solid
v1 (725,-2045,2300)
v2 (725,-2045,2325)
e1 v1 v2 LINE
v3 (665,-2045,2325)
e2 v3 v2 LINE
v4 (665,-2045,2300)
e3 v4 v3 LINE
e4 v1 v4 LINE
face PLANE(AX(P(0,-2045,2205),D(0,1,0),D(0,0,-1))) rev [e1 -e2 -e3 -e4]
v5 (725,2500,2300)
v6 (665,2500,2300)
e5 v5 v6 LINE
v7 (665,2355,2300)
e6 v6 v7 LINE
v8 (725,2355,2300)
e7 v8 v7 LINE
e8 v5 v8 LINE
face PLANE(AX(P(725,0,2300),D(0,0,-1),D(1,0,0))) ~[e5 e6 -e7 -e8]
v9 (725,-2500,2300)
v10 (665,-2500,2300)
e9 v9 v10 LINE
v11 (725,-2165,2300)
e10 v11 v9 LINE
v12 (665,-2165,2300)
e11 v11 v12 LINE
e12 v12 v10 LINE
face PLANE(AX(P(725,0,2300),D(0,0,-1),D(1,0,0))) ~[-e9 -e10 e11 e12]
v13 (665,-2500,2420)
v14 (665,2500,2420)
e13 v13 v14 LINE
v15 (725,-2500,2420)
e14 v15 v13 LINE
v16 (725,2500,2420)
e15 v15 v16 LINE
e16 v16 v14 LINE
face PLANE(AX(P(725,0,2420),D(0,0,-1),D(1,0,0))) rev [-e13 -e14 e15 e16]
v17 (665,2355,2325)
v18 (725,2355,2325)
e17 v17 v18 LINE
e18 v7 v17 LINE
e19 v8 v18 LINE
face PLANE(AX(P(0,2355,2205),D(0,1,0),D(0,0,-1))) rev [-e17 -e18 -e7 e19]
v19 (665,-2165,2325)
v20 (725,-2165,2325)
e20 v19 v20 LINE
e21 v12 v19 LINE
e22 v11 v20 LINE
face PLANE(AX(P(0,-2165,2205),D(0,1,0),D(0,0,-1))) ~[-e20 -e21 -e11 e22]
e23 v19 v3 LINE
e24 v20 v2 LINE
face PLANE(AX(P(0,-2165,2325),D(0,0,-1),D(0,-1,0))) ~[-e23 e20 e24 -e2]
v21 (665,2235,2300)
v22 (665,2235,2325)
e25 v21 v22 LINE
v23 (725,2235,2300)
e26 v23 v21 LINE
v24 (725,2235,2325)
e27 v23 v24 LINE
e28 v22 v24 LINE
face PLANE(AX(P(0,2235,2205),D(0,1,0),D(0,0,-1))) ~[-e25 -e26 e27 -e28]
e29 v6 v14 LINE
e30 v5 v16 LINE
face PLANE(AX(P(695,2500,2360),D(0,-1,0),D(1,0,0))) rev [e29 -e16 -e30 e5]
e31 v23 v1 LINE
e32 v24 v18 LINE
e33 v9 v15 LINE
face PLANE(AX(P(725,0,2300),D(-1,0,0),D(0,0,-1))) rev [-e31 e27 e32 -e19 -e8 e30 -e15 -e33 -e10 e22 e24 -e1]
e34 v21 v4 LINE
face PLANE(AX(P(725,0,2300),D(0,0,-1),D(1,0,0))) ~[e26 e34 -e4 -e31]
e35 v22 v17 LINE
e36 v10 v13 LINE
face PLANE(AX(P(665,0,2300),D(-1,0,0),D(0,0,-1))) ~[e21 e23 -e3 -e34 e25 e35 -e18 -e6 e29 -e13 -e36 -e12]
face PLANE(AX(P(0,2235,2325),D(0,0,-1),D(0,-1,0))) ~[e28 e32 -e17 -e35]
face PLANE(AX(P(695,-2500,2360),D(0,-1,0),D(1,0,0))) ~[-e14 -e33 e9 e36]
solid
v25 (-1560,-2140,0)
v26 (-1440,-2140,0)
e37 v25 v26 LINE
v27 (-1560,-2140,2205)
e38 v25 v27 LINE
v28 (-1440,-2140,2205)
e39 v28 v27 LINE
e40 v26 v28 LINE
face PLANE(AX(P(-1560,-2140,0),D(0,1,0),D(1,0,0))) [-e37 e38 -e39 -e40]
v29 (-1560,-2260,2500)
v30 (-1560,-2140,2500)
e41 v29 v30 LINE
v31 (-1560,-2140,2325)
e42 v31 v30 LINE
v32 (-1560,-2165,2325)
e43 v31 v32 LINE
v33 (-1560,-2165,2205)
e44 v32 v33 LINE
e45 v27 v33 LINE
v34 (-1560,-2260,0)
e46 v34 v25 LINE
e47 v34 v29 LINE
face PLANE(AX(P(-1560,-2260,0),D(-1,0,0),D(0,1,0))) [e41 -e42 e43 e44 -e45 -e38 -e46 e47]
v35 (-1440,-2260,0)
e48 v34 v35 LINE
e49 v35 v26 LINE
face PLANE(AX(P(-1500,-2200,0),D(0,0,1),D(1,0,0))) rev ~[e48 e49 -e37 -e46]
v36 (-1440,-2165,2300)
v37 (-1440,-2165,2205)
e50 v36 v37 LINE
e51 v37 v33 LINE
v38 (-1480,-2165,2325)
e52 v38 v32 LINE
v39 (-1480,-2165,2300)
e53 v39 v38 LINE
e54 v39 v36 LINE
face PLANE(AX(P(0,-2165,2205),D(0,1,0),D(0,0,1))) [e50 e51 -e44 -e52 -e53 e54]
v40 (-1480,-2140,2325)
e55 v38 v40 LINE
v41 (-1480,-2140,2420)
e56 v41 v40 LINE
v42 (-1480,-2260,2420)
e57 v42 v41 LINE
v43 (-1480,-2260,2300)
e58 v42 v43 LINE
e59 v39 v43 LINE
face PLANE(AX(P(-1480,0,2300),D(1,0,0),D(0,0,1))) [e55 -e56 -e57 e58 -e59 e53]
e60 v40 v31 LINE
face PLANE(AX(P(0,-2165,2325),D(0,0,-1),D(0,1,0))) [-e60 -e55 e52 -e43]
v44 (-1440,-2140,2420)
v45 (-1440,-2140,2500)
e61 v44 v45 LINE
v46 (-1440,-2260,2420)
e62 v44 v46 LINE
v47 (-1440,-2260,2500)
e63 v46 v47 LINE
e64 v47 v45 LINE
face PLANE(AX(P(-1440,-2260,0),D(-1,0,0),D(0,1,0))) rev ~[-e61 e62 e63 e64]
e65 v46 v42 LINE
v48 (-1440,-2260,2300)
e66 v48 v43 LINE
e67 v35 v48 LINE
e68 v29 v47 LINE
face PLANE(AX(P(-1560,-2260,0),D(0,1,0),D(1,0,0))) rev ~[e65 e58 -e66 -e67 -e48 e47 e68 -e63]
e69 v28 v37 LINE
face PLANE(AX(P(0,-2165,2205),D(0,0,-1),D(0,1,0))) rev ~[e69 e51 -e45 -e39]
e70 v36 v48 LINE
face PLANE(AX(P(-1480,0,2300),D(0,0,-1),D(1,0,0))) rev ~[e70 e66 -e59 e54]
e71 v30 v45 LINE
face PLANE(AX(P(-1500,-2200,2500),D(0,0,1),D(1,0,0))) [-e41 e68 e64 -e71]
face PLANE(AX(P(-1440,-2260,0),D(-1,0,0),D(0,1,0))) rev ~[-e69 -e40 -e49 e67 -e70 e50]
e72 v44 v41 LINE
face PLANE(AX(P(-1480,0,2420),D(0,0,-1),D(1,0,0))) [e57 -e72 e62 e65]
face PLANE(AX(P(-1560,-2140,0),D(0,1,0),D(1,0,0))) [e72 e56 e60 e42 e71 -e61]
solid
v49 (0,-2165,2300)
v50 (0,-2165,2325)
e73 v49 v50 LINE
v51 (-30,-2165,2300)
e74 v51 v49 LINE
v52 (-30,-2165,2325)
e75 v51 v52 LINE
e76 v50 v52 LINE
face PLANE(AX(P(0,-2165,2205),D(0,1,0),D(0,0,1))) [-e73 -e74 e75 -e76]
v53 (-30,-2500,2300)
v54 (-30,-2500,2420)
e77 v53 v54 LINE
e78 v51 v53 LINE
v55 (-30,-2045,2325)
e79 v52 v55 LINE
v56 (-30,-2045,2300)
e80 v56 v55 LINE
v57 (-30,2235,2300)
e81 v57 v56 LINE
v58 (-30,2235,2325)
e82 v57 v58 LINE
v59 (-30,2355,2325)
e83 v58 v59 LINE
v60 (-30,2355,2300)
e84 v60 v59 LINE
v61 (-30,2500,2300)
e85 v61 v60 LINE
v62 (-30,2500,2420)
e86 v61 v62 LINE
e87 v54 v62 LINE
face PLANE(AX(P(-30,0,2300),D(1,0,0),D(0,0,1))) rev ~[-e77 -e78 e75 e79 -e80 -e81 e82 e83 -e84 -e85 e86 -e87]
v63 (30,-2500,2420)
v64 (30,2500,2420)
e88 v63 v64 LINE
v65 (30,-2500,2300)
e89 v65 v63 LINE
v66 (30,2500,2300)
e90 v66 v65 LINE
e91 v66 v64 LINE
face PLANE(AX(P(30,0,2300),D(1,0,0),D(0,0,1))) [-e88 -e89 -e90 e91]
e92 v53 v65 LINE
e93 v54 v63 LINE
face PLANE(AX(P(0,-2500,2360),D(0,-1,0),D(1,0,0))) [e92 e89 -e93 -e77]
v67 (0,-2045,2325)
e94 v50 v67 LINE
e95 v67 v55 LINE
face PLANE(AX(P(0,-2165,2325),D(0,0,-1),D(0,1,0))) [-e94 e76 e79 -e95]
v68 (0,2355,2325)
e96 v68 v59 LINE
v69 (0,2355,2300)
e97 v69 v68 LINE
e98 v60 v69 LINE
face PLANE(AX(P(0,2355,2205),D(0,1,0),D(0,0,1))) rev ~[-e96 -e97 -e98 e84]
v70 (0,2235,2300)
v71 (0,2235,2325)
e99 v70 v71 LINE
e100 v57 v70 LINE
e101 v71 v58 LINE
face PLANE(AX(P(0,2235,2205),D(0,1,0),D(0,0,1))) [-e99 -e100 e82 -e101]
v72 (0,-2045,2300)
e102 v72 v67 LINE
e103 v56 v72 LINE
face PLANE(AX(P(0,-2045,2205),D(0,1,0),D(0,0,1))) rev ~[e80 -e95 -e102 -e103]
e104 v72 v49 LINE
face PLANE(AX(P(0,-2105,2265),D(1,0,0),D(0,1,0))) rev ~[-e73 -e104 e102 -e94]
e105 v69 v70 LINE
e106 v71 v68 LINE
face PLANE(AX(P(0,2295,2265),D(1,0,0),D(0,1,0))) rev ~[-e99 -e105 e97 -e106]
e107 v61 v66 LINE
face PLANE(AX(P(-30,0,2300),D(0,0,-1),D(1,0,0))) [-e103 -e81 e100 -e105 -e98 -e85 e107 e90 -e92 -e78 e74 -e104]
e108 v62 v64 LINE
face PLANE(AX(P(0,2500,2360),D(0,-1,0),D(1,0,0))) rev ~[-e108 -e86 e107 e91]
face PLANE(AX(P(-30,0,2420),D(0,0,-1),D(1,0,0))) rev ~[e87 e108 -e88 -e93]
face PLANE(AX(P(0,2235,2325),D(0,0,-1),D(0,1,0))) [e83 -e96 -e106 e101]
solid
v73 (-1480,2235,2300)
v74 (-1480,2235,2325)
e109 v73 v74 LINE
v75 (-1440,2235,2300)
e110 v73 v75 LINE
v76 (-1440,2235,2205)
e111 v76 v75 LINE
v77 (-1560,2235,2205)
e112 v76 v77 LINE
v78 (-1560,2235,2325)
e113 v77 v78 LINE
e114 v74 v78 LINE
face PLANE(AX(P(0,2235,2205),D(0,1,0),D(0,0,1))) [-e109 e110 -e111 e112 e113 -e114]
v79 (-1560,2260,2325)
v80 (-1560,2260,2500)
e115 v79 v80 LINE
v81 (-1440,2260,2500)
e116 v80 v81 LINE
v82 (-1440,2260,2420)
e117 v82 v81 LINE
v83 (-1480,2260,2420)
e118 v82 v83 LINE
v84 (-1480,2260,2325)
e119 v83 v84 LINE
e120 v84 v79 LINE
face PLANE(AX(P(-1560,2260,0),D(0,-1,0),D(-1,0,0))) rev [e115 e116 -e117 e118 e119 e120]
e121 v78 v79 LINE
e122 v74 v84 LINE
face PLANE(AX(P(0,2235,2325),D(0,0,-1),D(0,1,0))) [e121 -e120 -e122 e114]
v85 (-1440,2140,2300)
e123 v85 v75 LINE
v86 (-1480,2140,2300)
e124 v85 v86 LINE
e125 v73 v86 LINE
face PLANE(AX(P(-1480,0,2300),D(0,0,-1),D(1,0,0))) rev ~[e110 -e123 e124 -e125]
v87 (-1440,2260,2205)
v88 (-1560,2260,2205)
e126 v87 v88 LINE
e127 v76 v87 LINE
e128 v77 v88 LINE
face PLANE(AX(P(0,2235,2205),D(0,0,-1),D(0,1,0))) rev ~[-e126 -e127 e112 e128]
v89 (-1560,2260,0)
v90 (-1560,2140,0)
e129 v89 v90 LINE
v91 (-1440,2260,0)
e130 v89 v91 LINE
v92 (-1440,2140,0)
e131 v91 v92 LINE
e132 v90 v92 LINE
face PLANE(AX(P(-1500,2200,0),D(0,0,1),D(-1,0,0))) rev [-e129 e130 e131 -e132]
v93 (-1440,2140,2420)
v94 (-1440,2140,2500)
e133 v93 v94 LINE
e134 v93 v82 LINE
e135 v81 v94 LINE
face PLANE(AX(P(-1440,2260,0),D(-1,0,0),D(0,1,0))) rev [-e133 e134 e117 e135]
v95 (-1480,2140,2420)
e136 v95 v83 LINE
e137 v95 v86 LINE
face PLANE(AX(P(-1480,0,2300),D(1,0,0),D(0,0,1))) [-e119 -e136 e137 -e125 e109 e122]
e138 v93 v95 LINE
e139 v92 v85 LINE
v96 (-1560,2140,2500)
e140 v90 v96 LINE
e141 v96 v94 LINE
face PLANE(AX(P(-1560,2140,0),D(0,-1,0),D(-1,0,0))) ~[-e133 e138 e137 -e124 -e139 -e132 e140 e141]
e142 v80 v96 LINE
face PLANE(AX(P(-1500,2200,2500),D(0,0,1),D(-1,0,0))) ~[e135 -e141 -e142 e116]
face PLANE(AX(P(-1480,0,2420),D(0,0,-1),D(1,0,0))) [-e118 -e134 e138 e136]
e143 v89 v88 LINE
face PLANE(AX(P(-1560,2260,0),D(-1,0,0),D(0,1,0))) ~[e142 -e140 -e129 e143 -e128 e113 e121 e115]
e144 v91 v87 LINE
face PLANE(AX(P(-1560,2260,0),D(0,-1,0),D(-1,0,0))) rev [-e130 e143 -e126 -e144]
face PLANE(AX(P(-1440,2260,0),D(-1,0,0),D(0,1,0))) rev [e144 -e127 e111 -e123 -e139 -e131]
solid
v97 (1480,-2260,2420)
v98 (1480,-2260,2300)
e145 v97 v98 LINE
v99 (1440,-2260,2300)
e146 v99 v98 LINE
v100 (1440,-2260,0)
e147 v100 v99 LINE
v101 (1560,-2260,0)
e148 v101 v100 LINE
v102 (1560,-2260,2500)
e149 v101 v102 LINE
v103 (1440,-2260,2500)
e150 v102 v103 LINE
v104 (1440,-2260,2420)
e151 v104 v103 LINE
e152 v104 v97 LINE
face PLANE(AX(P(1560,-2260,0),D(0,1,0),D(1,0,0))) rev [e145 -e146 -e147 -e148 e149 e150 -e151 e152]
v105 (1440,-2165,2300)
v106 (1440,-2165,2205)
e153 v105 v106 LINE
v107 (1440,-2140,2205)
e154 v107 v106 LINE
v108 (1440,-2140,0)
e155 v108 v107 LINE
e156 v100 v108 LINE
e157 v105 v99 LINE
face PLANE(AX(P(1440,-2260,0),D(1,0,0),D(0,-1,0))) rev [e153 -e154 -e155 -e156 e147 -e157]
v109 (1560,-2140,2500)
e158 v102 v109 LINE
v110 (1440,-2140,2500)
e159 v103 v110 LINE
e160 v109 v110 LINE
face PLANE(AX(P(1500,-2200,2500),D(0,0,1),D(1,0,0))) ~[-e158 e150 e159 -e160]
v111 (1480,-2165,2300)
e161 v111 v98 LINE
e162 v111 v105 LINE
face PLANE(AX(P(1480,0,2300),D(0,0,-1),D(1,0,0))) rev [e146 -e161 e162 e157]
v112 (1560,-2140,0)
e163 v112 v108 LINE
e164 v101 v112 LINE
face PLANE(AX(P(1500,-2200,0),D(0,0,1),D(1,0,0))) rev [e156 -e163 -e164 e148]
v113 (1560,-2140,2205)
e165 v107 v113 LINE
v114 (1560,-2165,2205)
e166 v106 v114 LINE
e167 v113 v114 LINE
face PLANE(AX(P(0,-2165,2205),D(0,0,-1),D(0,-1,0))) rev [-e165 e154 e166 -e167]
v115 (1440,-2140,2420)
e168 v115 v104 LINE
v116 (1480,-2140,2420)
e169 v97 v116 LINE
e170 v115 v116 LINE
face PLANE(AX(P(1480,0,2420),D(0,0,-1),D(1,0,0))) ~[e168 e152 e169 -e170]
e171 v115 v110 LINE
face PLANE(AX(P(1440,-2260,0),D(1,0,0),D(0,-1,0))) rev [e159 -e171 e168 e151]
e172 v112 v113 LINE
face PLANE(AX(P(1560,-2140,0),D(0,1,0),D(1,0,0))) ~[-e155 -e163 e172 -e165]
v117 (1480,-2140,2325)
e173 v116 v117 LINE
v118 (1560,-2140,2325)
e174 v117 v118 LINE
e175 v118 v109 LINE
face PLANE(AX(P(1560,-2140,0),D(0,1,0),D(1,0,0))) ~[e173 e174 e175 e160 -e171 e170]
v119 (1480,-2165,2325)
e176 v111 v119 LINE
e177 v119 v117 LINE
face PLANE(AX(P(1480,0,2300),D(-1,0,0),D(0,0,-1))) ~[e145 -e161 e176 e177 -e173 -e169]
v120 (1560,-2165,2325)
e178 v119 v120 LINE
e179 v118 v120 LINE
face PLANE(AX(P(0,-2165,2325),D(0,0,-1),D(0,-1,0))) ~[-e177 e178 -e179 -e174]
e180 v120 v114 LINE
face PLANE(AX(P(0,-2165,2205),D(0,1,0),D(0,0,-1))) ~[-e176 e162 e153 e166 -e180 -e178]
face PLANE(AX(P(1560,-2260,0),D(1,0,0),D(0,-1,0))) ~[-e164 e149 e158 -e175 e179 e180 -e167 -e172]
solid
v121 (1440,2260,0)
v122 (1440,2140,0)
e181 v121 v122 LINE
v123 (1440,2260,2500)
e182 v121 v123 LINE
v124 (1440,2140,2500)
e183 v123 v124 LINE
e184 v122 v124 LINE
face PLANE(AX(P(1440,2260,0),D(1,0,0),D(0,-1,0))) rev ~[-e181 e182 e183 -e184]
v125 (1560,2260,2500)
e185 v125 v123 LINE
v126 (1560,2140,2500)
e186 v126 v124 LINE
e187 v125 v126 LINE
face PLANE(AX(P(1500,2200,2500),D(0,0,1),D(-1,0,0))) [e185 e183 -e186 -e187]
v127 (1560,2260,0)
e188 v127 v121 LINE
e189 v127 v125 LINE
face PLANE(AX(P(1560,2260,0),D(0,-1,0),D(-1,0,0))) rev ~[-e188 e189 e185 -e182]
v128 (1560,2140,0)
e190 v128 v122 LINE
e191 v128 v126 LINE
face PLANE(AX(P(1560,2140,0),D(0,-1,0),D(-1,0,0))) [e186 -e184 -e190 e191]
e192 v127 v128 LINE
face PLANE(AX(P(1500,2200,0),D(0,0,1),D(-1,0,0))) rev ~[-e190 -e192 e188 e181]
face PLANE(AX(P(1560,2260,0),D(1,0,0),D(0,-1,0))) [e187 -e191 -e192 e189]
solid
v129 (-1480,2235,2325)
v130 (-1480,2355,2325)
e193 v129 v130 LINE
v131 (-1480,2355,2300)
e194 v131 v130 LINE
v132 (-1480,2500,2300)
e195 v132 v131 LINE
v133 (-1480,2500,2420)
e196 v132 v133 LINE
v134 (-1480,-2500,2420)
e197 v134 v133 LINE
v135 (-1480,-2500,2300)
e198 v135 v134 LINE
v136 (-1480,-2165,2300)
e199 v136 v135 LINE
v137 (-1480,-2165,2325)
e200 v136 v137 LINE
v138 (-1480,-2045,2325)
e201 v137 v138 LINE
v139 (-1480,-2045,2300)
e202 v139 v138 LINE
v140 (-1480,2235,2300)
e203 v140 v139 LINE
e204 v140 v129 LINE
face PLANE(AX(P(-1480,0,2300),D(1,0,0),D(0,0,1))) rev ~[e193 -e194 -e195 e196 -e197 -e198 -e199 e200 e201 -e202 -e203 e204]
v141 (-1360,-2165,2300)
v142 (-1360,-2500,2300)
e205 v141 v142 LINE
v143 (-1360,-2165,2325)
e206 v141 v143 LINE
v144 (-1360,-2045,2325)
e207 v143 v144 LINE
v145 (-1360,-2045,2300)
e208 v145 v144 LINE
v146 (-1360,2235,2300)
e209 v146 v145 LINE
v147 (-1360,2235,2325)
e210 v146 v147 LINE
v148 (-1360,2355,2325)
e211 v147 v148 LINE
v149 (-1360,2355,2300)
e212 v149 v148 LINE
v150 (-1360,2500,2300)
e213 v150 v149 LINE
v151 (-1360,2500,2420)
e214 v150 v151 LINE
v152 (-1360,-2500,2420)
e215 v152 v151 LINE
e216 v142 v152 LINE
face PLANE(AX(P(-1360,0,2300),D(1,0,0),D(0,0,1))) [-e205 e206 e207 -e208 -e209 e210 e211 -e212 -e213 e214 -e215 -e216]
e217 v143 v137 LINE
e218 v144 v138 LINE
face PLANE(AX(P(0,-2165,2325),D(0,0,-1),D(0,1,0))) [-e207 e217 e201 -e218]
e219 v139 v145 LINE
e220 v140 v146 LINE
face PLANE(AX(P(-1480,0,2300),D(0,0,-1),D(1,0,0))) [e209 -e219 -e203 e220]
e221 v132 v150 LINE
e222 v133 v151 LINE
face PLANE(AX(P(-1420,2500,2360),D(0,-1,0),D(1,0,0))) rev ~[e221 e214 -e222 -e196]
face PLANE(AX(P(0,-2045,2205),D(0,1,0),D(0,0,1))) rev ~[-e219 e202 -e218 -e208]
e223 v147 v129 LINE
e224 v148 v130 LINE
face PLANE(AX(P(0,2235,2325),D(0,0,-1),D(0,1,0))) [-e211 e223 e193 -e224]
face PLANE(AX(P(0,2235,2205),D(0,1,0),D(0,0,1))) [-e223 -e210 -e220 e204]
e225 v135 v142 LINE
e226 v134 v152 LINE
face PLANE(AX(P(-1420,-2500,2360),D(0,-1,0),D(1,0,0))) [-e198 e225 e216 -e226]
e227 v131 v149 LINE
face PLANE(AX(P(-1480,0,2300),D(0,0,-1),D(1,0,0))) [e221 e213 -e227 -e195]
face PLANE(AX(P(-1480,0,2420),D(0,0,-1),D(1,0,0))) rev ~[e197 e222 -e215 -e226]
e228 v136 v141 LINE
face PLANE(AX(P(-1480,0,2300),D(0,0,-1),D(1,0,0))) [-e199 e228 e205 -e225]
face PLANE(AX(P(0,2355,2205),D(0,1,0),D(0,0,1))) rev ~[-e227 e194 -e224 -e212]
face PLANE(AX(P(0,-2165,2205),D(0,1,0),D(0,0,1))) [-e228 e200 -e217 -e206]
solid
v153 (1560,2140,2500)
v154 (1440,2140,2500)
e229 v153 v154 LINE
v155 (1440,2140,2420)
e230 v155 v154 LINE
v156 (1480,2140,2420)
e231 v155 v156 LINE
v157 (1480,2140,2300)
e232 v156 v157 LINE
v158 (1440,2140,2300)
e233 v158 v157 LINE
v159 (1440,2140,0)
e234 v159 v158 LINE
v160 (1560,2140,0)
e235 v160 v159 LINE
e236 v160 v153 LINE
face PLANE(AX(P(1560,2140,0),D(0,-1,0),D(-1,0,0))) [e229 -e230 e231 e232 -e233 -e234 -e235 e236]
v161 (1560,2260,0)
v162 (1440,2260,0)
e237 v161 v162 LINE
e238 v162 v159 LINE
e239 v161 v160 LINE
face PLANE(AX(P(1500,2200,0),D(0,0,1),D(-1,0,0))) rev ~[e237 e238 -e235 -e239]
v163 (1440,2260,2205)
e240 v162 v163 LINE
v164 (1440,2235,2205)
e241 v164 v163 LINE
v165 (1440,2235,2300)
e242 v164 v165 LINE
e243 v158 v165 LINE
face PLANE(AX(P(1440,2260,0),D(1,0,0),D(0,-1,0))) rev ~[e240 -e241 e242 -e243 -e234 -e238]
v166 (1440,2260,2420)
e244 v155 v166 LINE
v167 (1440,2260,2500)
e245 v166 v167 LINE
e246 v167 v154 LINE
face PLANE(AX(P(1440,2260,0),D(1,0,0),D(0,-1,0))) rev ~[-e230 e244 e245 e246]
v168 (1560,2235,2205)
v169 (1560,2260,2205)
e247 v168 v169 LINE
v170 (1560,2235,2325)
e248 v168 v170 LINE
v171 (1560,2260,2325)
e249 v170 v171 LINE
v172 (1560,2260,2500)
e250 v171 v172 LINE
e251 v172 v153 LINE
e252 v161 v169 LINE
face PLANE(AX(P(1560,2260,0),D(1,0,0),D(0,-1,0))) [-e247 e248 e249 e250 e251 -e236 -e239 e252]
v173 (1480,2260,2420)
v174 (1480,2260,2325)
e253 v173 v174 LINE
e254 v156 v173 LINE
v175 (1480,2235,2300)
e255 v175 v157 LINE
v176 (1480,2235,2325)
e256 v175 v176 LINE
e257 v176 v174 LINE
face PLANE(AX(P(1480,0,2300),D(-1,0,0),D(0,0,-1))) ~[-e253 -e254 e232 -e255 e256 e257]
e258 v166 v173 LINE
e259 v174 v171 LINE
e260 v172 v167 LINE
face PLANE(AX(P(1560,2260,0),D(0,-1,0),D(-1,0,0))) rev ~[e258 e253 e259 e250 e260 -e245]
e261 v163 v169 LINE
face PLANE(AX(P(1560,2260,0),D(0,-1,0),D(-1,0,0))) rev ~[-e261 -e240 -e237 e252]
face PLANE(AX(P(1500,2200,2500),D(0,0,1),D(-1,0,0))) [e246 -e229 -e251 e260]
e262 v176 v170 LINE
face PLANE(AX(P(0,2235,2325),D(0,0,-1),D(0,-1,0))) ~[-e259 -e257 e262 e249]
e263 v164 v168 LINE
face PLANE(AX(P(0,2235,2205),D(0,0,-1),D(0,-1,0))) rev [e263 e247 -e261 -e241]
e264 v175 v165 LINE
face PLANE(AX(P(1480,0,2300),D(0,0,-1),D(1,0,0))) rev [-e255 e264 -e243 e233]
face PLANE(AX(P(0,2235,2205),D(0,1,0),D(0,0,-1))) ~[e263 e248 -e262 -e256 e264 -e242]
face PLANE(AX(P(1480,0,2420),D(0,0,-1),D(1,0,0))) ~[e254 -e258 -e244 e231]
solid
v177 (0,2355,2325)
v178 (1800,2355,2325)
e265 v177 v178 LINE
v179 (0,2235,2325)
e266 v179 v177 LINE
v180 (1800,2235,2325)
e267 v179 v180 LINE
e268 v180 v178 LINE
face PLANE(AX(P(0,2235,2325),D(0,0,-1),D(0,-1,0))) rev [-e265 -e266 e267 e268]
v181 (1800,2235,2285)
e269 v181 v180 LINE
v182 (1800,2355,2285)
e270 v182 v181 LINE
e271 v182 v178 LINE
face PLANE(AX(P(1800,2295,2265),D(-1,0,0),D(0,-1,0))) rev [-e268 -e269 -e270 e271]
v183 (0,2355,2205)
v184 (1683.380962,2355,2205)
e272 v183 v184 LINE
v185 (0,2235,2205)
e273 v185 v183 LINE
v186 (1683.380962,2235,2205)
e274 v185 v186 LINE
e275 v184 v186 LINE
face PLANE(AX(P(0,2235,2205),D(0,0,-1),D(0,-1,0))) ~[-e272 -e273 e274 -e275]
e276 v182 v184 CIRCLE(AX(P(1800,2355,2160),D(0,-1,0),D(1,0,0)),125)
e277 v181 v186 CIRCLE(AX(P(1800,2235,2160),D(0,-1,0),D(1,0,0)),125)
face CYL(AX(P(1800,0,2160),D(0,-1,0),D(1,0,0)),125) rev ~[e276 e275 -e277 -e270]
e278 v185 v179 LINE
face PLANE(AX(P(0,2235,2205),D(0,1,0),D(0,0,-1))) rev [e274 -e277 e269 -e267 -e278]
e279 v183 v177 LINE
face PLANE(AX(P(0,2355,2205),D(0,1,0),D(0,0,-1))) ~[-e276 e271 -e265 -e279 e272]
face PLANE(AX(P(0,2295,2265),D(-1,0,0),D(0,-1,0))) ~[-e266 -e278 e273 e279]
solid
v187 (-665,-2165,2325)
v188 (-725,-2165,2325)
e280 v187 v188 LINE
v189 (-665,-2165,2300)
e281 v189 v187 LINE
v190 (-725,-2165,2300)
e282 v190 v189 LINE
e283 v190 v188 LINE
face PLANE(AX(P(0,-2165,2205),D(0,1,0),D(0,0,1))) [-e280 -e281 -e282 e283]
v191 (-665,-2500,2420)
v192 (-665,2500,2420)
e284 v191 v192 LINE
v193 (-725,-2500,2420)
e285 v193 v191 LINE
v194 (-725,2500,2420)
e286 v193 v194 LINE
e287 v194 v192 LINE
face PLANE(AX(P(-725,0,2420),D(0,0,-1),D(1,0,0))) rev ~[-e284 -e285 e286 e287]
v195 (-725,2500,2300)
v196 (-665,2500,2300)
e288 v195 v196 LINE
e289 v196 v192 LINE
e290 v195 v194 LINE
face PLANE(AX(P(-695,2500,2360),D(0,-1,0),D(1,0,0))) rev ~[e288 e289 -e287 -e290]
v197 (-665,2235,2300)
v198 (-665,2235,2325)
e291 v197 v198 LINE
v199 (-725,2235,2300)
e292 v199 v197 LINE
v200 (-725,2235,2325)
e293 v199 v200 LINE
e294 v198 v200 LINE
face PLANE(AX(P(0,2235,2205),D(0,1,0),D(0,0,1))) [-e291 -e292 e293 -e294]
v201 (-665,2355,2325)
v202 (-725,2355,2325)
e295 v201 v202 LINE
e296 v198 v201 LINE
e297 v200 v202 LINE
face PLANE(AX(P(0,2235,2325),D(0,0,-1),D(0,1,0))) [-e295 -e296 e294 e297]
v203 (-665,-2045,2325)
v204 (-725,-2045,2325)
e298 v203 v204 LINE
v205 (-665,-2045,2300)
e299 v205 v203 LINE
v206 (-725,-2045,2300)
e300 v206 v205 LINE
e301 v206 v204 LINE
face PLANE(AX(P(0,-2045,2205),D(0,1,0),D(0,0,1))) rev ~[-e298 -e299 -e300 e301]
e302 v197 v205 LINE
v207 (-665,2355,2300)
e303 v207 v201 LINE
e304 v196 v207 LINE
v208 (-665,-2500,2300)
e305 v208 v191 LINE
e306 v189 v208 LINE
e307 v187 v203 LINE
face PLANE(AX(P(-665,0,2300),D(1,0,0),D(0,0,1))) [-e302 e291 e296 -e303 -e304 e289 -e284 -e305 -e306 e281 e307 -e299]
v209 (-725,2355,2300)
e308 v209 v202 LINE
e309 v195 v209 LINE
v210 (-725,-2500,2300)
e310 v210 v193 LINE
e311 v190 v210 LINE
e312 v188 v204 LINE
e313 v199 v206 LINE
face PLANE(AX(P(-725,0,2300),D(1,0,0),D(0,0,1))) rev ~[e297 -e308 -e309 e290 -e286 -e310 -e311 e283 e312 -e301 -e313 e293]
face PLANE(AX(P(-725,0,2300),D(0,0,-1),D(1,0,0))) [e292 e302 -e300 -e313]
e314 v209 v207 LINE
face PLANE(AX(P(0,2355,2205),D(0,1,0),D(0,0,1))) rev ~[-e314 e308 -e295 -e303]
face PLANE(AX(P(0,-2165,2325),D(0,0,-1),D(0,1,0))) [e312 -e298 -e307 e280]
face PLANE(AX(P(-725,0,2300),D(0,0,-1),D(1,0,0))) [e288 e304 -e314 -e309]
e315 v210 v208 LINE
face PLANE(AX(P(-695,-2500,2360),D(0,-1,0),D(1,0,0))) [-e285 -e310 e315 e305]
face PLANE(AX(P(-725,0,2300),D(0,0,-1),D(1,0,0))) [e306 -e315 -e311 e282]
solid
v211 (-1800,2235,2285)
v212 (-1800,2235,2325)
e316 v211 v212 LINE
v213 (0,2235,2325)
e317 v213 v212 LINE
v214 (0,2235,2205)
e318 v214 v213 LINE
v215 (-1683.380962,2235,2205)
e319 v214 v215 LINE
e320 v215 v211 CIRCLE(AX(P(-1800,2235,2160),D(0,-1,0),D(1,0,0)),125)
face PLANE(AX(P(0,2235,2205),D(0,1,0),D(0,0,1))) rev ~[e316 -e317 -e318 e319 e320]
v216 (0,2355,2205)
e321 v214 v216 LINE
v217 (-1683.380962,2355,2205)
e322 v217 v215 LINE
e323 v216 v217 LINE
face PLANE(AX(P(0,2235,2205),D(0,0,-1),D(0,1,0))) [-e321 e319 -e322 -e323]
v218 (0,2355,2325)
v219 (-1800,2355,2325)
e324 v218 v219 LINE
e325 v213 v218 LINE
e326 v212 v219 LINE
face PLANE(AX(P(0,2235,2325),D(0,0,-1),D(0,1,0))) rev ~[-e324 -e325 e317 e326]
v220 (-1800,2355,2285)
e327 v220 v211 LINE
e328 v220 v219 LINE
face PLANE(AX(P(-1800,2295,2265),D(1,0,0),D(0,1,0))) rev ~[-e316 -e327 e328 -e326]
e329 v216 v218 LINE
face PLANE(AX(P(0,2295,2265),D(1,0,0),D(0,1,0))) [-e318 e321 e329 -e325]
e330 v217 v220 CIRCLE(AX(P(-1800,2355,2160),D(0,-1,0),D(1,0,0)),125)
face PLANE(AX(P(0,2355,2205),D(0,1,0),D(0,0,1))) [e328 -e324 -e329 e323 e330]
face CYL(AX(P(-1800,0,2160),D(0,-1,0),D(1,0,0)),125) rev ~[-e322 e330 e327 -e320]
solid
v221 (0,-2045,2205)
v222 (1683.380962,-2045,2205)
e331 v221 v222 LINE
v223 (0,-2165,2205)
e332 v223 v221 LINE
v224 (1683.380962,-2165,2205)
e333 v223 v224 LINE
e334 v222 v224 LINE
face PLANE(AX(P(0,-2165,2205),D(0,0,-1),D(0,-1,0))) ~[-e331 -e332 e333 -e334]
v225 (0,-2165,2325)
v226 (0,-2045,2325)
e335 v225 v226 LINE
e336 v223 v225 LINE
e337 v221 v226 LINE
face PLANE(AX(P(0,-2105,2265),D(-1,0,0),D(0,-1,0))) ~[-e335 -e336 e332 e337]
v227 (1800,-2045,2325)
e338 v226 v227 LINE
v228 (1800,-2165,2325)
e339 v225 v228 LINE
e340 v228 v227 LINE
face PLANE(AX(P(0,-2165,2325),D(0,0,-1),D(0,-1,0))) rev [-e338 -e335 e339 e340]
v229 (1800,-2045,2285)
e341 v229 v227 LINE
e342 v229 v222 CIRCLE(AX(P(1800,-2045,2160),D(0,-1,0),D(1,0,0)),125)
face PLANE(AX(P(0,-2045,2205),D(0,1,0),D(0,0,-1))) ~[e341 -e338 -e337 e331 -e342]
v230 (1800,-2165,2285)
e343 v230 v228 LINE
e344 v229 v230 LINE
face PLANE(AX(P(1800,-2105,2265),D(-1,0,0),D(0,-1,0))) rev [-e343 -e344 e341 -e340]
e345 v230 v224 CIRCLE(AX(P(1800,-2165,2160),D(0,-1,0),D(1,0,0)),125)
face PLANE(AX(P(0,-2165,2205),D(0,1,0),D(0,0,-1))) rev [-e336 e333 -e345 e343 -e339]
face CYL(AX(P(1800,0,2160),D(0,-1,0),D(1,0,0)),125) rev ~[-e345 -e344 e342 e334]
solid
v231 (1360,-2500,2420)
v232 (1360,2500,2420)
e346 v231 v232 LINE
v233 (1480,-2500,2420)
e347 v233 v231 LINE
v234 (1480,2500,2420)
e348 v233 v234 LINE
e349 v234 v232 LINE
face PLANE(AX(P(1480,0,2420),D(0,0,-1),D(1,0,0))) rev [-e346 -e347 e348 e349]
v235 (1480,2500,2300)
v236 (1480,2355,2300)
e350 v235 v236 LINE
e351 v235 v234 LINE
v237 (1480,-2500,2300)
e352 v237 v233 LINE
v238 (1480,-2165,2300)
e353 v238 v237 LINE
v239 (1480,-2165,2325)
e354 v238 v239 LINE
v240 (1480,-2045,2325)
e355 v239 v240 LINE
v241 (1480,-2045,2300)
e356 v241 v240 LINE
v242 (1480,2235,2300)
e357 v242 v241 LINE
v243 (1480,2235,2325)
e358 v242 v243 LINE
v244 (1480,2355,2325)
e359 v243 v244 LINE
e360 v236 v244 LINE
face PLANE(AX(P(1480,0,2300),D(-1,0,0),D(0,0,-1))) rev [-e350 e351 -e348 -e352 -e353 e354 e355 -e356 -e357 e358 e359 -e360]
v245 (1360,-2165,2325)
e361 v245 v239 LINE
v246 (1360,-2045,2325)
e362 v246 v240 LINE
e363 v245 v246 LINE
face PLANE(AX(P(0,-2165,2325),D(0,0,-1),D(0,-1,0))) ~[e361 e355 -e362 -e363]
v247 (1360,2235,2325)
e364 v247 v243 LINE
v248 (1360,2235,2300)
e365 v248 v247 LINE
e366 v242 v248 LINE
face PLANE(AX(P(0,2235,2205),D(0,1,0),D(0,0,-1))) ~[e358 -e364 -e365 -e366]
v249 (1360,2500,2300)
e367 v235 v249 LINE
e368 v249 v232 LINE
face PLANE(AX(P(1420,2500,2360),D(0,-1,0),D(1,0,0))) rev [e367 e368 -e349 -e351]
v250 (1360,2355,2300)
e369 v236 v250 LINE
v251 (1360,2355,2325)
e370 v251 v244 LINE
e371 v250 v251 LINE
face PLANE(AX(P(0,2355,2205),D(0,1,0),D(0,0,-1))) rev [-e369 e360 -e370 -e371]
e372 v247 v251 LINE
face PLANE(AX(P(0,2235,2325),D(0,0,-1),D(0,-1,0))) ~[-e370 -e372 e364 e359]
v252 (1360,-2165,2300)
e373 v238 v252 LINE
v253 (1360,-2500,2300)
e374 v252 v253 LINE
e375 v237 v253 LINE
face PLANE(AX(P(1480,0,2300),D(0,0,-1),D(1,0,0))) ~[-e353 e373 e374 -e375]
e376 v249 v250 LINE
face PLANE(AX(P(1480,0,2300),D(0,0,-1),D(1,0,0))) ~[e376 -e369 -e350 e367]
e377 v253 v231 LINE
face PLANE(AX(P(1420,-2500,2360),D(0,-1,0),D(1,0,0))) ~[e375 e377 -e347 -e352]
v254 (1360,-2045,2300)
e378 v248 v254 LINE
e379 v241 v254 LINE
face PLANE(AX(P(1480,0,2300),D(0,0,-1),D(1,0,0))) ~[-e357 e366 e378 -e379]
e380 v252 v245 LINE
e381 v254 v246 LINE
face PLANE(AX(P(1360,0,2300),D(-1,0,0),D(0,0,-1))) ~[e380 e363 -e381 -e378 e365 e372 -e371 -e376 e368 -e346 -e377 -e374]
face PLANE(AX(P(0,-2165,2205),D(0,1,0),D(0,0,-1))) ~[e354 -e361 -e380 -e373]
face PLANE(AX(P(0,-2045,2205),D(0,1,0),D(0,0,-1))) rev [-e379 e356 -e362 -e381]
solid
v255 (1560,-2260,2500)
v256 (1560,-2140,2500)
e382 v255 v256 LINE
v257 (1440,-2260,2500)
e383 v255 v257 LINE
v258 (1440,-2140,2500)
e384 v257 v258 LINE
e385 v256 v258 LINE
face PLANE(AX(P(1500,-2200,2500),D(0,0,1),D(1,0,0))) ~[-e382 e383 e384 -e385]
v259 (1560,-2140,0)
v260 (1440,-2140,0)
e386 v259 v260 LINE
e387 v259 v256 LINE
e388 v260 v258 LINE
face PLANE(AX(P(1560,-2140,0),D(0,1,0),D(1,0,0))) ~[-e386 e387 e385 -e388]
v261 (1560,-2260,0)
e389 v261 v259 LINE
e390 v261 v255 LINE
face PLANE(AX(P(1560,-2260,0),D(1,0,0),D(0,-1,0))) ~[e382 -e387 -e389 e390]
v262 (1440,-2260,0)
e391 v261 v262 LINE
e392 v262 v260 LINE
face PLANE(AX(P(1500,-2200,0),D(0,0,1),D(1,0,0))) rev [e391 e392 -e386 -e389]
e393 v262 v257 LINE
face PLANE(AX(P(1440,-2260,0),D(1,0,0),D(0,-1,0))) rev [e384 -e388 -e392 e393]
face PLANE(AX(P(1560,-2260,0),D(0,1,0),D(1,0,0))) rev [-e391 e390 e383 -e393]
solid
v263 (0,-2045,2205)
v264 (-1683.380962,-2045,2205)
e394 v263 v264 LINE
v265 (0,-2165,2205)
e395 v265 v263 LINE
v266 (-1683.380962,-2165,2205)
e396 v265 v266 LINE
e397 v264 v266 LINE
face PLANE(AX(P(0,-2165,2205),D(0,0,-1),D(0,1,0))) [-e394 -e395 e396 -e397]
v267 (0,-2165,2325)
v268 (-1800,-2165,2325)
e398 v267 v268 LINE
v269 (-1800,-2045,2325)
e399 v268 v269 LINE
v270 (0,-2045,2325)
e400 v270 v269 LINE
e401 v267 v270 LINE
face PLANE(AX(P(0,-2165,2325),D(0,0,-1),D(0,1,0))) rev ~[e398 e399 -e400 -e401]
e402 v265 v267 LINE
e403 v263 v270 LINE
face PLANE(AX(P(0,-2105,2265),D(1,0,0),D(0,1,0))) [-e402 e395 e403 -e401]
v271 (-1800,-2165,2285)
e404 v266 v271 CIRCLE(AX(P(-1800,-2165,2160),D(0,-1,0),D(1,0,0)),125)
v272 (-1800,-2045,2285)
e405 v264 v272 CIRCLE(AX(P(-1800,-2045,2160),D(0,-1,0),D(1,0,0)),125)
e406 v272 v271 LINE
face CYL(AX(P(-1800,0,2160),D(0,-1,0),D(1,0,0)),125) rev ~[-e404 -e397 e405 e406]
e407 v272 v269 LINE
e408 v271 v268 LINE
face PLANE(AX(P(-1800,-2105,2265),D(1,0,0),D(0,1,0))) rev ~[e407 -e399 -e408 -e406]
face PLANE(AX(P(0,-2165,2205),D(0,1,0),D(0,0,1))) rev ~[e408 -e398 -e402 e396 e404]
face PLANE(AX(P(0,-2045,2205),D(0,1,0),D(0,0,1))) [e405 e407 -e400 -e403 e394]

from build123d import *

# Parameters (mm, degrees)
F1_W           = 120
F1_H           = 120
F2_DEPTH       = 2500
F5_W           = 120
F5_H           = 120
F6_DEPTH       = 2500
F7_DEPTH       = 2500
F8_W           = 60
F8_H           = 120
F9_DEPTH       = 2500
F10_W          = 120
F10_H          = 120
F11_DEPTH      = 1800
F12_DEPTH      = 1800.001
F14_R          = 125
F15_DEPTH      = 2500.001
F15_DEPTH_BACK = 2500.001


with BuildPart() as f2:
    # F1 (on Top) → F2 (new body)
    with BuildSketch(Plane.XY):
        with Locations((-1500, -2200)):
            Rectangle(F1_W, F1_H)
    extrude(amount=F2_DEPTH)


with BuildPart() as f3_1:
    # F3: instance of F2
    add(f2.part.mirror(Plane.XZ))


with BuildPart() as f4_1:
    # F4: instance of F2
    add(f2.part.mirror(Plane.YZ))


with BuildPart() as f4_2:
    # F4: instance of F3_1
    add(f3_1.part.mirror(Plane.YZ))


with BuildPart() as f6:
    # F5 (on Front) → F6 (new body, symmetric)
    with BuildSketch(Plane.XZ):
        with Locations((-1420, 2360)):
            Rectangle(F5_W, F5_H)
    extrude(amount=F6_DEPTH, both=True)


with BuildPart() as f7_tool:
    # F5 (on Front) → F7 (new body, symmetric)
    with BuildSketch(Plane.XZ):
        with Locations((-1420, 2360)):
            Rectangle(F5_W, F5_H)
    extrude(amount=F7_DEPTH, both=True)


with BuildPart() as f2_1:
    add(f2.part)

    # F7: cut by f7_tool
    add(f7_tool.part, mode=Mode.SUBTRACT)


with BuildPart() as f3_1_1:
    add(f3_1.part)

    # F7: cut by f7_tool
    add(f7_tool.part, mode=Mode.SUBTRACT)


with BuildPart() as f9:
    # F8 (on Front) → F9 (new body, symmetric)
    with BuildSketch(Plane.XZ):
        with Locations((0, 2360)):
            Rectangle(F8_W, F8_H)
    extrude(amount=F9_DEPTH, both=True)


with BuildPart() as f9b:
    # F8 (on Front) → F9, piece 2 (new body, symmetric)
    with BuildSketch(Plane.XZ):
        with Locations((-695, 2360)):
            Rectangle(F8_W, F8_H)
    extrude(amount=F9_DEPTH, both=True)


with BuildPart() as f11:
    # F10 (on Right) → F11 (new body)
    with BuildSketch(Plane.YZ):
        with Locations((2295, 2265)):
            Rectangle(F10_W, F10_H)
    extrude(amount=-F11_DEPTH)


with BuildPart() as f11b:
    # F10 (on Right) → F11, piece 2 (new body)
    with BuildSketch(Plane.YZ):
        with Locations((-2105, 2265)):
            Rectangle(F10_W, F10_H)
    extrude(amount=-F11_DEPTH)


with BuildPart() as f12_tool:
    # F10 (on Right) → F12 (new body, through all)
    with BuildSketch(Plane.YZ):
        with Locations((2295, 2265)):
            Rectangle(F10_W, F10_H)
        with Locations((-2105, 2265)):
            Rectangle(F10_W, F10_H)
    extrude(amount=-F12_DEPTH)


with BuildPart() as f2_2:
    add(f2_1.part)

    # F12: cut by f12_tool
    add(f12_tool.part, mode=Mode.SUBTRACT)


with BuildPart() as f3_1_2:
    add(f3_1_1.part)

    # F12: cut by f12_tool
    add(f12_tool.part, mode=Mode.SUBTRACT)


with BuildPart() as f6_1:
    add(f6.part)

    # F12: cut by f12_tool
    add(f12_tool.part, mode=Mode.SUBTRACT)


with BuildPart() as f9_1:
    add(f9.part)

    # F12: cut by f12_tool
    add(f12_tool.part, mode=Mode.SUBTRACT)


with BuildPart() as f9b_1:
    add(f9b.part)

    # F12: cut by f12_tool
    add(f12_tool.part, mode=Mode.SUBTRACT)


with BuildPart() as f13_1:
    # F13: instance of F9b
    add(f9b_1.part.mirror(Plane.YZ))


with BuildPart() as f13_2:
    # F13: instance of F6
    add(f6_1.part.mirror(Plane.YZ))


with BuildPart() as f13_3:
    # F13: instance of F11
    add(f11.part.mirror(Plane.YZ))


with BuildPart() as f13_4:
    # F13: instance of F11b
    add(f11b.part.mirror(Plane.YZ))


with BuildPart() as f13_5:
    # F13: instance of F2
    add(f2_2.part.mirror(Plane.YZ))


with BuildPart() as f13_6:
    # F13: instance of F3_1
    add(f3_1_2.part.mirror(Plane.YZ))


with BuildPart() as f15_tool:
    # F14 (on Front) → F15 (new body, two sides)
    with BuildSketch(Plane.XZ) as f15_sk:
        with Locations((1800, 2160)):
            Circle(F14_R)
        with Locations((-1800, 2160)):
            Circle(F14_R)
    extrude(amount=F15_DEPTH)
    extrude(f15_sk.sketch, amount=-F15_DEPTH_BACK)


with BuildPart() as f11_1:
    add(f11.part)

    # F15: cut by f15_tool
    add(f15_tool.part, mode=Mode.SUBTRACT)


with BuildPart() as f11b_1:
    add(f11b.part)

    # F15: cut by f15_tool
    add(f15_tool.part, mode=Mode.SUBTRACT)


with BuildPart() as f13_3_1:
    add(f13_3.part)

    # F15: cut by f15_tool
    add(f15_tool.part, mode=Mode.SUBTRACT)


with BuildPart() as f13_4_1:
    add(f13_4.part)

    # F15: cut by f15_tool
    add(f15_tool.part, mode=Mode.SUBTRACT)


solid = Compound([f4_1.part, f4_2.part, f2_2.part, f3_1_2.part, f6_1.part, f9_1.part, f9b_1.part, f13_1.part, f13_2.part, f13_5.part, f13_6.part, f11_1.part, f11b_1.part, f13_3_1.part, f13_4_1.part])
